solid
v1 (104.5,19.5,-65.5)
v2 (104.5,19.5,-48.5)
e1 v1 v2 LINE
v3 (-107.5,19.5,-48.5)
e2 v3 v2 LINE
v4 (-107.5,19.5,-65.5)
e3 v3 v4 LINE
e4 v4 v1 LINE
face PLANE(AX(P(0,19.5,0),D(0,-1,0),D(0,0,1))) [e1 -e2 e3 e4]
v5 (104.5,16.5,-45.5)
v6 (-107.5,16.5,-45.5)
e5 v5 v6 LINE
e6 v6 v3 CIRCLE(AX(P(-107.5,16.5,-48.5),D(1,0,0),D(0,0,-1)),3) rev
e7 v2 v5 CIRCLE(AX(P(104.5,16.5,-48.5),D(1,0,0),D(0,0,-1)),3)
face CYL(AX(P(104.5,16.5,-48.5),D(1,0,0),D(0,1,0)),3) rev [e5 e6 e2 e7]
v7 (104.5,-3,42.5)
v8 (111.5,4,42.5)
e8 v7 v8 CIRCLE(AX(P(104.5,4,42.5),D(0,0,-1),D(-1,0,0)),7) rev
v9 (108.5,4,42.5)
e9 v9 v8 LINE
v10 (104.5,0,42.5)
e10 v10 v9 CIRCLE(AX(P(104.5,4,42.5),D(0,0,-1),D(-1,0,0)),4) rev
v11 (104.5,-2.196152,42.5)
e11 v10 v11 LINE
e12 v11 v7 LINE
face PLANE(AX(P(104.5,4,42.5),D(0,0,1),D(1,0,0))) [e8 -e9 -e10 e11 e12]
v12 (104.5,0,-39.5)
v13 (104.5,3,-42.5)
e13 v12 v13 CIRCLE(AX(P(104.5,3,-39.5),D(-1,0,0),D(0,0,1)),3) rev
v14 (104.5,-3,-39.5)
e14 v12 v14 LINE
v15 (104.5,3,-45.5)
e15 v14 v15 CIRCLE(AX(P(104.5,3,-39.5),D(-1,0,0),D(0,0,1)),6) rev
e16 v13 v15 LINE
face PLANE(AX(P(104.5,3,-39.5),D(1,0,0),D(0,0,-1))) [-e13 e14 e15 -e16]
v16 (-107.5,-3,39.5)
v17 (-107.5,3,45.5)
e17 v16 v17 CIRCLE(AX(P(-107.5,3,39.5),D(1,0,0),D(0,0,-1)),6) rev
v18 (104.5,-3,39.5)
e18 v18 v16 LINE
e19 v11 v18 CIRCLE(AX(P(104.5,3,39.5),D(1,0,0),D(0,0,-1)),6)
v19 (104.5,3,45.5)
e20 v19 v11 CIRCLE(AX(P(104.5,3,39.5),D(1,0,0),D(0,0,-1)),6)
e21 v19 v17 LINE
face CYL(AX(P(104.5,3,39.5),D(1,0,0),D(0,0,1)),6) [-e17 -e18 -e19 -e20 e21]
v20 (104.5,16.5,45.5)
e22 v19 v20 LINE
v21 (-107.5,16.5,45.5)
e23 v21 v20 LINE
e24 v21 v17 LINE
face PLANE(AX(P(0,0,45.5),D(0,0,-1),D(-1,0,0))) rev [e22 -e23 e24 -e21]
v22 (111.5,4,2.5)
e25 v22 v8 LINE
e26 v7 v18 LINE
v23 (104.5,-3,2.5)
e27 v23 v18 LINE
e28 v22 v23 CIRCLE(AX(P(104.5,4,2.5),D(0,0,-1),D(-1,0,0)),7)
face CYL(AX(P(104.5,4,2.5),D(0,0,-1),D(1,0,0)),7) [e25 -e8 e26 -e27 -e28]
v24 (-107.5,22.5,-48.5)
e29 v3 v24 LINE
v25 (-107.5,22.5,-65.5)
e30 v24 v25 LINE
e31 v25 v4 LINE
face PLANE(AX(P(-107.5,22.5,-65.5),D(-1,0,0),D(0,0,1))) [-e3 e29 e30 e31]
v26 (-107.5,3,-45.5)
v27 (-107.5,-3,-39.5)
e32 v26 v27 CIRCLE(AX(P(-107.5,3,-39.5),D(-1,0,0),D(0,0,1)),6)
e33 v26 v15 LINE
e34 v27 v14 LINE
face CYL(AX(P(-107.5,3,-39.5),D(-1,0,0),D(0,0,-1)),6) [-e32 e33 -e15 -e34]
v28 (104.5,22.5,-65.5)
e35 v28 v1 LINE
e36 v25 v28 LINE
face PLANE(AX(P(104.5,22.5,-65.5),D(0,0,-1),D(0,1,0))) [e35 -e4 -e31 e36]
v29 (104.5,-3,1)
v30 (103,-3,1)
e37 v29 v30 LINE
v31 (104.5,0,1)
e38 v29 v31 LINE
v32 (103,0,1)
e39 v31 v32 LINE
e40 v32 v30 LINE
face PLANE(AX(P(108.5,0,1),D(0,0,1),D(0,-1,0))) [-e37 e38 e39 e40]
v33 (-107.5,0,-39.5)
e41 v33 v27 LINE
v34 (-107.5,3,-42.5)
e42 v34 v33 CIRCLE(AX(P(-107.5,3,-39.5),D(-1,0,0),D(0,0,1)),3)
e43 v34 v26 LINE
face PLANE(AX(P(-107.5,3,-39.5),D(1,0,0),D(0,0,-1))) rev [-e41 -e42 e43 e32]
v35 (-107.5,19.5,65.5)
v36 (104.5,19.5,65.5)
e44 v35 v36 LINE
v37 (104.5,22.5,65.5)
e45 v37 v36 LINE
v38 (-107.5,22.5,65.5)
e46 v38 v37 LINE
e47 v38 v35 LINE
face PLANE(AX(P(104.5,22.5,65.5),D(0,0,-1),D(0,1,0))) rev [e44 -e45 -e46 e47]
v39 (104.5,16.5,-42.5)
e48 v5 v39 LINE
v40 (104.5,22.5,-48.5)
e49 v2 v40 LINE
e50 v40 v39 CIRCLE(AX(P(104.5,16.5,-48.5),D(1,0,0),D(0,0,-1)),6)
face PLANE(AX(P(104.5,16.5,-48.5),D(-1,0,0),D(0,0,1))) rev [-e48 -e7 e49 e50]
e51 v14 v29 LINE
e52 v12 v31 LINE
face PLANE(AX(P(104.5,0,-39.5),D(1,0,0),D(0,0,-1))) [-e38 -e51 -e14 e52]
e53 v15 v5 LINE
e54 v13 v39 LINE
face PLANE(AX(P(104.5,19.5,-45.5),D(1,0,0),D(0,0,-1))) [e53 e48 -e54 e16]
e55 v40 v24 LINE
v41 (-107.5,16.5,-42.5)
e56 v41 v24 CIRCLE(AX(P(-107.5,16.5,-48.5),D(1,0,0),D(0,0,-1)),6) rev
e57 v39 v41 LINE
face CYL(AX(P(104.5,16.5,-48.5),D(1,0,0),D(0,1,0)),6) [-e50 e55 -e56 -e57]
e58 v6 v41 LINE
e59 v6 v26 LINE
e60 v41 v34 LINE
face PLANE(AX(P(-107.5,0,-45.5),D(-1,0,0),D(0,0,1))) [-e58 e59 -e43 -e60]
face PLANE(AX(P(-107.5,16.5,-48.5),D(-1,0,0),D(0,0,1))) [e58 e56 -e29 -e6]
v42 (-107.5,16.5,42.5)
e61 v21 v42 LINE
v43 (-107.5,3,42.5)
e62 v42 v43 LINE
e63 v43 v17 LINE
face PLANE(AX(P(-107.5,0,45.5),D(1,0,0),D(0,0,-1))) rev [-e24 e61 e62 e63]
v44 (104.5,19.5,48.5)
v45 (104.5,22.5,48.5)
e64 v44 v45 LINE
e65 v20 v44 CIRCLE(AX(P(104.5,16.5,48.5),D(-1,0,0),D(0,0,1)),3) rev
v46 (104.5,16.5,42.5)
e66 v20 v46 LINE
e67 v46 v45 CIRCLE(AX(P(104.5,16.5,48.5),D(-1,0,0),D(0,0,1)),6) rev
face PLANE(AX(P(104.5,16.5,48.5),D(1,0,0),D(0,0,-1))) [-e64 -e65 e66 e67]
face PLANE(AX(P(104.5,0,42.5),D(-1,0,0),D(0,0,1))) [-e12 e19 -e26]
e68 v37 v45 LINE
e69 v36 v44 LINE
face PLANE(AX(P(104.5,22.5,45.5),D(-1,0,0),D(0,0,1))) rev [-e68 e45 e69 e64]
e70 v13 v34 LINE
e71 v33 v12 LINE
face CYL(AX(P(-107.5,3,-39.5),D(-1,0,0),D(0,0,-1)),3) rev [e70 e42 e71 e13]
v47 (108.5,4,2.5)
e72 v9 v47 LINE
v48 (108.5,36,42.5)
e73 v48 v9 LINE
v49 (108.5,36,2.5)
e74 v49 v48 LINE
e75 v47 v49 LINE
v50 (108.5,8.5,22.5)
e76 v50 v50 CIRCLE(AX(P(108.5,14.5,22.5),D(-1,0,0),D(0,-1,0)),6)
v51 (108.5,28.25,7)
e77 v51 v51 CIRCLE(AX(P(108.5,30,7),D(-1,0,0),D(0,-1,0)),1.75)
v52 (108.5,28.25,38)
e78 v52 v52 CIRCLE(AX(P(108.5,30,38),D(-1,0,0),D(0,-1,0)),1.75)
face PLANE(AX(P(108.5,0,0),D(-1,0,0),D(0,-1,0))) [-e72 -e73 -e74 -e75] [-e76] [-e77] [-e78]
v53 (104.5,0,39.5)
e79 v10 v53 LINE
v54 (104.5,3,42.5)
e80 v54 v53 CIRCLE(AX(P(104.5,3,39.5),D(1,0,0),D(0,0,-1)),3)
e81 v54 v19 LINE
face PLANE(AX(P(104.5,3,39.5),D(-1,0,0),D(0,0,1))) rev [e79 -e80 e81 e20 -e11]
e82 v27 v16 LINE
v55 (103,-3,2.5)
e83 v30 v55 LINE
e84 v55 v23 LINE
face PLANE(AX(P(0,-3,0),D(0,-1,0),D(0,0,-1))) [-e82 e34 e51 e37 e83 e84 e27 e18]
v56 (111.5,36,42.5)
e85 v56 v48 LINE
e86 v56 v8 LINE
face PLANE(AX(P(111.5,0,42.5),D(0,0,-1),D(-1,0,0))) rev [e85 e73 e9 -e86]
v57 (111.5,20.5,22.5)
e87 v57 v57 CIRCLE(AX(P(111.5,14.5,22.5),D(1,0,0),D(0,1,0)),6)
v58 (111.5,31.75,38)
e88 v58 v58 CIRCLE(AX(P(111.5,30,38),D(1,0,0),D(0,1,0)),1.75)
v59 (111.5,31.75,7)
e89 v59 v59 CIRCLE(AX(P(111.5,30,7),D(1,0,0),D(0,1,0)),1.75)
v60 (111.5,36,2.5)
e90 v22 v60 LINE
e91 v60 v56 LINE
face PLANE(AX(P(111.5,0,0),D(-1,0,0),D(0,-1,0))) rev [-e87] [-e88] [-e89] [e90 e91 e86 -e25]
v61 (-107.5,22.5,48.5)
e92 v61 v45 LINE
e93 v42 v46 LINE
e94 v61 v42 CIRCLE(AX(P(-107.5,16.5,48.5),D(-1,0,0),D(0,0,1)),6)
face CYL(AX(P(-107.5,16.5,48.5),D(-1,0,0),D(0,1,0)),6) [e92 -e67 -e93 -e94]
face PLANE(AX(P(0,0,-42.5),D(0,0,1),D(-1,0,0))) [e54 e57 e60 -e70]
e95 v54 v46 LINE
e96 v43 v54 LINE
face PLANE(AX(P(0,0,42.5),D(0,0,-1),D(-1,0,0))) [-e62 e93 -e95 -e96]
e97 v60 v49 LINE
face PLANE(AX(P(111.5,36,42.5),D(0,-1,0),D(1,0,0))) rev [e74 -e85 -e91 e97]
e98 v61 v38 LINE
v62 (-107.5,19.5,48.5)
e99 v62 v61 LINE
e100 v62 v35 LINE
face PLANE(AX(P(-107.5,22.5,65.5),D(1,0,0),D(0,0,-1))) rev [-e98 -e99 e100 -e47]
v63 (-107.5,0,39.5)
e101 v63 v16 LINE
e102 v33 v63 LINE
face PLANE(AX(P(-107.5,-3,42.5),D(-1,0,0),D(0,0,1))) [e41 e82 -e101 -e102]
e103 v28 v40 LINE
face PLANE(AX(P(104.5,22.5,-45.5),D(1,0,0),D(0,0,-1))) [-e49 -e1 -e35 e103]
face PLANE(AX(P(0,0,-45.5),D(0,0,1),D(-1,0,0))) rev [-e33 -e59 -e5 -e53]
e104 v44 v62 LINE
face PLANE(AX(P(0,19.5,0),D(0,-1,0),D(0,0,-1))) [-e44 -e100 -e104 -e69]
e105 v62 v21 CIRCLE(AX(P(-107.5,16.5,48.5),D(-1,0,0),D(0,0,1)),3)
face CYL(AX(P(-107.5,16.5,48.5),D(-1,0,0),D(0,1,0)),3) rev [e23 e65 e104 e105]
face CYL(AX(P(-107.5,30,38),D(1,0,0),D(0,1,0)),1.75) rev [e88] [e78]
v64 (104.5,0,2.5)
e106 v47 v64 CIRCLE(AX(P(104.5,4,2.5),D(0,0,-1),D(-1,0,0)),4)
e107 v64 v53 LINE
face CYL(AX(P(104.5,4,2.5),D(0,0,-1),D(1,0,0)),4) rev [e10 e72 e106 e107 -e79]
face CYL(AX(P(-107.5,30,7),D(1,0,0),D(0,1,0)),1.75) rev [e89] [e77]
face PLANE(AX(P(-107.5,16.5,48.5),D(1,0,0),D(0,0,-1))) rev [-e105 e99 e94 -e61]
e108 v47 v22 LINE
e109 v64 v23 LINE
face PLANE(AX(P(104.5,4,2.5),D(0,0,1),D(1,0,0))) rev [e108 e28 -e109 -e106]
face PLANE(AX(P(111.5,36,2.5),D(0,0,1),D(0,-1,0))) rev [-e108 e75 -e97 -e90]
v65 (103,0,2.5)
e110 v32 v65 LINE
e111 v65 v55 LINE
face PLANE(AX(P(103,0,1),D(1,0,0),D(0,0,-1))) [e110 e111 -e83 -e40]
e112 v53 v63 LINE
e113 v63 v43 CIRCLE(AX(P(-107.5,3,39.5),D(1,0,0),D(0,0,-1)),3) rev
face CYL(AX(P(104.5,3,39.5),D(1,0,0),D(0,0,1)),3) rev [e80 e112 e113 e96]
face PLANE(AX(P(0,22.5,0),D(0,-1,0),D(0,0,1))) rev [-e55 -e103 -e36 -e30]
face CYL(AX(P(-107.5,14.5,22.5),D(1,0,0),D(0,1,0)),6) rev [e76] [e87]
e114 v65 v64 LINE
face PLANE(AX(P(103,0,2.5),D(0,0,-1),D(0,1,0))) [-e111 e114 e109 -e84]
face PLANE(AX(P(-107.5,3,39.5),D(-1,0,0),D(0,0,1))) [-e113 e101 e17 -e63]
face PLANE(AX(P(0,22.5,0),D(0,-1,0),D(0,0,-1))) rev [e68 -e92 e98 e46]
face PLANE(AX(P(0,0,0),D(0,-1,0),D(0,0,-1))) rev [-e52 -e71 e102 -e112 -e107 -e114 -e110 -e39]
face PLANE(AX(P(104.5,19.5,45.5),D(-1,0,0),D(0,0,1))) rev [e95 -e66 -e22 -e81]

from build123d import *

# Parameters (mm, degrees)
BASE_FLANGE1_DEPTH            = 3
EDGE_FLANGE1_STRIP_W          = 20
EDGE_FLANGE1_STRIP_H          = 3
EDGE_FLANGE1_STRIP_CUT_DEPTH  = 40
EDGE_FLANGE1_RELIEF_W         = 21.5
EDGE_FLANGE1_RELIEF_H         = 1.5
EDGE_FLANGE1_RELIEF_CUT_DEPTH = 3
EDGE_FLANGE1_DEPTH            = 40
SKETCH10_R                    = 1.75
SKETCH10_R_2                  = 6
CUT_EXTRUDE1_DEPTH            = 226.971790275
EDGE_FLANGE2_STRIP_W          = 18
EDGE_FLANGE2_STRIP_H          = 3
EDGE_FLANGE2_STRIP_CUT_DEPTH  = 212
EDGE_FLANGE2_DEPTH            = 212
EDGE_FLANGE3_STRIP_W          = 18
EDGE_FLANGE3_STRIP_H          = 3
EDGE_FLANGE3_STRIP_CUT_DEPTH  = 212
EDGE_FLANGE3_DEPTH            = 212
MIRROR1_START                 = -107.5
MIRROR1_DEPTH                 = 213.5
MIRROR1_START_2               = 104.5
MIRROR1_2_DEPTH               = 1.5
MIRROR1_3_DEPTH               = 212
CUT_EXTRUDE2_DEPTH            = 10


# Read off the part's stored shape, not the designer's step: Mirror1
# Sheet-metal steps are written as plain solids
with BuildPart() as part:
    # Sketch1 → Base-Flange1 (new body)
    with BuildSketch(Plane(origin=(0, 0, 0), x_dir=(1, 0, 0), z_dir=(0, 1, 0))):
        Polygon((-107.5, -42.5), (108.5, -42.5), (108.5, -2.5), (107.5, -2.5), (107.5, 42.5), (-107.5, 42.5), align=None)
    extrude(amount=-BASE_FLANGE1_DEPTH)

    # Edge-Flange1 strip (across the edge) → Edge-Flange1 strip cut (cut)
    with BuildSketch(Plane(origin=(108.5, 0, 42.5), x_dir=(-1, 0, 0), z_dir=(0, 0, -1))):
        with Locations((-6, -1.5)):
            Rectangle(EDGE_FLANGE1_STRIP_W, EDGE_FLANGE1_STRIP_H)
    extrude(amount=EDGE_FLANGE1_STRIP_CUT_DEPTH, mode=Mode.SUBTRACT)

    # Edge-Flange1 relief (on the sheet) → Edge-Flange1 relief cut (cut)
    with BuildSketch(Plane(origin=(104.5, 0, 42.5), x_dir=(-1, 0, 0), z_dir=(0, 1, 0))):
        with Locations((-9.25, -40.75)):
            Rectangle(EDGE_FLANGE1_RELIEF_W, EDGE_FLANGE1_RELIEF_H)
    extrude(amount=-EDGE_FLANGE1_RELIEF_CUT_DEPTH, mode=Mode.SUBTRACT)

    # Edge-Flange1 section (across the edge) → Edge-Flange1 (add)
    with BuildSketch(Plane(origin=(108.5, 0, 42.5), x_dir=(-1, 0, 0), z_dir=(0, 0, -1))):
        with BuildLine():
            Line((-3, 4), (-3, 36))
            Line((-3, 36), (0, 36))
            Line((0, 36), (0, 4))
            ThreePointArc((0, 4), (1.171572875, 1.171572875), (4, 0))
            Line((4, 0), (4, -3))
            ThreePointArc((4, -3), (-0.949747468, -0.949747468), (-3, 4))
        make_face()
    extrude(amount=EDGE_FLANGE1_DEPTH)

    # Sketch10 → Cut-Extrude1 (cut, through all)
    with BuildSketch(Plane(origin=(111.5, 0, 0), x_dir=(0, 0, -1), z_dir=(1, 0, 0))):
        with Locations(Location((-38, 30, 0), (0, 0, 90))):
            Circle(SKETCH10_R)
        with Locations(Location((-7, 30, 0), (0, 0, 90))):
            Circle(SKETCH10_R)
        with Locations(Location((-22.5, 14.5, 0), (0, 0, 90))):
            Circle(SKETCH10_R_2)
    extrude(amount=-CUT_EXTRUDE1_DEPTH, mode=Mode.SUBTRACT)

    # Edge-Flange2 strip (across the edge) → Edge-Flange2 strip cut (cut)
    with BuildSketch(Plane(origin=(-107.5, 0, 42.5), x_dir=(0, 0, -1), z_dir=(1, 0, 0))):
        with Locations((-6, -1.5)):
            Rectangle(EDGE_FLANGE2_STRIP_W, EDGE_FLANGE2_STRIP_H)
    extrude(amount=EDGE_FLANGE2_STRIP_CUT_DEPTH, mode=Mode.SUBTRACT)

    # Edge-Flange2 section (across the edge) → Edge-Flange2 (add)
    with BuildSketch(Plane(origin=(-107.5, 0, 42.5), x_dir=(0, 0, -1), z_dir=(1, 0, 0))):
        with BuildLine():
            Line((-3, 3), (-3, 19.5))
            Line((-3, 19.5), (0, 19.5))
            Line((0, 19.5), (0, 3))
            ThreePointArc((0, 3), (0.878679656, 0.878679656), (3, 0))
            Line((3, 0), (3, -3))
            ThreePointArc((3, -3), (-1.242640687, -1.242640687), (-3, 3))
        make_face()
    extrude(amount=EDGE_FLANGE2_DEPTH)

    # Edge-Flange3 strip (across the edge) → Edge-Flange3 strip cut (cut)
    with BuildSketch(Plane(origin=(104.5, 19.5, 45.5), x_dir=(0, -1, 0), z_dir=(-1, 0, 0))):
        with Locations((-6, -1.5)):
            Rectangle(EDGE_FLANGE3_STRIP_W, EDGE_FLANGE3_STRIP_H)
    extrude(amount=EDGE_FLANGE3_STRIP_CUT_DEPTH, mode=Mode.SUBTRACT)

    # Edge-Flange3 section (across the edge) → Edge-Flange3 (add)
    with BuildSketch(Plane(origin=(104.5, 19.5, 45.5), x_dir=(0, -1, 0), z_dir=(-1, 0, 0))):
        with BuildLine():
            Line((-3, 3), (-3, 20))
            Line((-3, 20), (0, 20))
            Line((0, 20), (0, 3))
            ThreePointArc((0, 3), (0.878679656, 0.878679656), (3, 0))
            Line((3, 0), (3, -3))
            ThreePointArc((3, -3), (-1.242640687, -1.242640687), (-3, 3))
        make_face()
    extrude(amount=EDGE_FLANGE3_DEPTH)

    # Mirror1 outline → Mirror1 (cut)
    with BuildSketch(Plane.YZ.offset(MIRROR1_START)):
        with BuildLine():
            Line((-3, -42.5), (-2.196152423, -42.5))
            ThreePointArc((-2.196152423, -42.5), (-2.795554958, -41.052914271), (-3, -39.5))
            Line((-3, -39.5), (-3, -42.5))
        make_face()
    extrude(amount=MIRROR1_DEPTH, mode=Mode.SUBTRACT)

    # Mirror1 2 outline → Mirror1 2 (cut)
    with BuildSketch(Plane.YZ.offset(MIRROR1_START_2)):
        with BuildLine():
            ThreePointArc((-3, -39.5), (-2.795554958, -41.052914271), (-2.196152423, -42.5))
            Line((-2.196152423, -42.5), (0, -42.5))
            Line((0, -42.5), (0, -38))
            Line((0, -38), (-3, -38))
            Line((-3, -38), (-3, -39.5))
        make_face()
    extrude(amount=MIRROR1_2_DEPTH, mode=Mode.SUBTRACT)

    # Mirror1 3 outline → Mirror1 3 (add)
    with BuildSketch(Plane.YZ.offset(MIRROR1_START)):
        with BuildLine():
            Line((3, -45.5), (16.5, -45.5))
            ThreePointArc((16.5, -45.5), (18.621320344, -46.378679656), (19.5, -48.5))
            Line((19.5, -48.5), (19.5, -65.5))
            Line((19.5, -65.5), (22.5, -65.5))
            Line((22.5, -65.5), (22.5, -48.5))
            ThreePointArc((22.5, -48.5), (20.742640687, -44.257359313), (16.5, -42.5))
            Line((16.5, -42.5), (3, -42.5))
            ThreePointArc((3, -42.5), (0.878679656, -41.621320344), (0, -39.5))
            Line((0, -39.5), (0, -42.5))
            Line((0, -42.5), (-2.196152423, -42.5))
            ThreePointArc((-2.196152423, -42.5), (0, -44.696152423), (3, -45.5))
        make_face()
    extrude(amount=MIRROR1_3_DEPTH)

    # Sketch19 → Cut-Extrude2 (cut)
    with BuildSketch(Plane(origin=(0, 0, 0), x_dir=(1, 0, 0), z_dir=(0, 1, 0))):
        Polygon((107.5, -1), (107.5, 42.5), (106, 42.5), (104.5, 38), (104.5, -1), align=None)
    extrude(amount=-CUT_EXTRUDE2_DEPTH, mode=Mode.SUBTRACT)


solid = part.part
